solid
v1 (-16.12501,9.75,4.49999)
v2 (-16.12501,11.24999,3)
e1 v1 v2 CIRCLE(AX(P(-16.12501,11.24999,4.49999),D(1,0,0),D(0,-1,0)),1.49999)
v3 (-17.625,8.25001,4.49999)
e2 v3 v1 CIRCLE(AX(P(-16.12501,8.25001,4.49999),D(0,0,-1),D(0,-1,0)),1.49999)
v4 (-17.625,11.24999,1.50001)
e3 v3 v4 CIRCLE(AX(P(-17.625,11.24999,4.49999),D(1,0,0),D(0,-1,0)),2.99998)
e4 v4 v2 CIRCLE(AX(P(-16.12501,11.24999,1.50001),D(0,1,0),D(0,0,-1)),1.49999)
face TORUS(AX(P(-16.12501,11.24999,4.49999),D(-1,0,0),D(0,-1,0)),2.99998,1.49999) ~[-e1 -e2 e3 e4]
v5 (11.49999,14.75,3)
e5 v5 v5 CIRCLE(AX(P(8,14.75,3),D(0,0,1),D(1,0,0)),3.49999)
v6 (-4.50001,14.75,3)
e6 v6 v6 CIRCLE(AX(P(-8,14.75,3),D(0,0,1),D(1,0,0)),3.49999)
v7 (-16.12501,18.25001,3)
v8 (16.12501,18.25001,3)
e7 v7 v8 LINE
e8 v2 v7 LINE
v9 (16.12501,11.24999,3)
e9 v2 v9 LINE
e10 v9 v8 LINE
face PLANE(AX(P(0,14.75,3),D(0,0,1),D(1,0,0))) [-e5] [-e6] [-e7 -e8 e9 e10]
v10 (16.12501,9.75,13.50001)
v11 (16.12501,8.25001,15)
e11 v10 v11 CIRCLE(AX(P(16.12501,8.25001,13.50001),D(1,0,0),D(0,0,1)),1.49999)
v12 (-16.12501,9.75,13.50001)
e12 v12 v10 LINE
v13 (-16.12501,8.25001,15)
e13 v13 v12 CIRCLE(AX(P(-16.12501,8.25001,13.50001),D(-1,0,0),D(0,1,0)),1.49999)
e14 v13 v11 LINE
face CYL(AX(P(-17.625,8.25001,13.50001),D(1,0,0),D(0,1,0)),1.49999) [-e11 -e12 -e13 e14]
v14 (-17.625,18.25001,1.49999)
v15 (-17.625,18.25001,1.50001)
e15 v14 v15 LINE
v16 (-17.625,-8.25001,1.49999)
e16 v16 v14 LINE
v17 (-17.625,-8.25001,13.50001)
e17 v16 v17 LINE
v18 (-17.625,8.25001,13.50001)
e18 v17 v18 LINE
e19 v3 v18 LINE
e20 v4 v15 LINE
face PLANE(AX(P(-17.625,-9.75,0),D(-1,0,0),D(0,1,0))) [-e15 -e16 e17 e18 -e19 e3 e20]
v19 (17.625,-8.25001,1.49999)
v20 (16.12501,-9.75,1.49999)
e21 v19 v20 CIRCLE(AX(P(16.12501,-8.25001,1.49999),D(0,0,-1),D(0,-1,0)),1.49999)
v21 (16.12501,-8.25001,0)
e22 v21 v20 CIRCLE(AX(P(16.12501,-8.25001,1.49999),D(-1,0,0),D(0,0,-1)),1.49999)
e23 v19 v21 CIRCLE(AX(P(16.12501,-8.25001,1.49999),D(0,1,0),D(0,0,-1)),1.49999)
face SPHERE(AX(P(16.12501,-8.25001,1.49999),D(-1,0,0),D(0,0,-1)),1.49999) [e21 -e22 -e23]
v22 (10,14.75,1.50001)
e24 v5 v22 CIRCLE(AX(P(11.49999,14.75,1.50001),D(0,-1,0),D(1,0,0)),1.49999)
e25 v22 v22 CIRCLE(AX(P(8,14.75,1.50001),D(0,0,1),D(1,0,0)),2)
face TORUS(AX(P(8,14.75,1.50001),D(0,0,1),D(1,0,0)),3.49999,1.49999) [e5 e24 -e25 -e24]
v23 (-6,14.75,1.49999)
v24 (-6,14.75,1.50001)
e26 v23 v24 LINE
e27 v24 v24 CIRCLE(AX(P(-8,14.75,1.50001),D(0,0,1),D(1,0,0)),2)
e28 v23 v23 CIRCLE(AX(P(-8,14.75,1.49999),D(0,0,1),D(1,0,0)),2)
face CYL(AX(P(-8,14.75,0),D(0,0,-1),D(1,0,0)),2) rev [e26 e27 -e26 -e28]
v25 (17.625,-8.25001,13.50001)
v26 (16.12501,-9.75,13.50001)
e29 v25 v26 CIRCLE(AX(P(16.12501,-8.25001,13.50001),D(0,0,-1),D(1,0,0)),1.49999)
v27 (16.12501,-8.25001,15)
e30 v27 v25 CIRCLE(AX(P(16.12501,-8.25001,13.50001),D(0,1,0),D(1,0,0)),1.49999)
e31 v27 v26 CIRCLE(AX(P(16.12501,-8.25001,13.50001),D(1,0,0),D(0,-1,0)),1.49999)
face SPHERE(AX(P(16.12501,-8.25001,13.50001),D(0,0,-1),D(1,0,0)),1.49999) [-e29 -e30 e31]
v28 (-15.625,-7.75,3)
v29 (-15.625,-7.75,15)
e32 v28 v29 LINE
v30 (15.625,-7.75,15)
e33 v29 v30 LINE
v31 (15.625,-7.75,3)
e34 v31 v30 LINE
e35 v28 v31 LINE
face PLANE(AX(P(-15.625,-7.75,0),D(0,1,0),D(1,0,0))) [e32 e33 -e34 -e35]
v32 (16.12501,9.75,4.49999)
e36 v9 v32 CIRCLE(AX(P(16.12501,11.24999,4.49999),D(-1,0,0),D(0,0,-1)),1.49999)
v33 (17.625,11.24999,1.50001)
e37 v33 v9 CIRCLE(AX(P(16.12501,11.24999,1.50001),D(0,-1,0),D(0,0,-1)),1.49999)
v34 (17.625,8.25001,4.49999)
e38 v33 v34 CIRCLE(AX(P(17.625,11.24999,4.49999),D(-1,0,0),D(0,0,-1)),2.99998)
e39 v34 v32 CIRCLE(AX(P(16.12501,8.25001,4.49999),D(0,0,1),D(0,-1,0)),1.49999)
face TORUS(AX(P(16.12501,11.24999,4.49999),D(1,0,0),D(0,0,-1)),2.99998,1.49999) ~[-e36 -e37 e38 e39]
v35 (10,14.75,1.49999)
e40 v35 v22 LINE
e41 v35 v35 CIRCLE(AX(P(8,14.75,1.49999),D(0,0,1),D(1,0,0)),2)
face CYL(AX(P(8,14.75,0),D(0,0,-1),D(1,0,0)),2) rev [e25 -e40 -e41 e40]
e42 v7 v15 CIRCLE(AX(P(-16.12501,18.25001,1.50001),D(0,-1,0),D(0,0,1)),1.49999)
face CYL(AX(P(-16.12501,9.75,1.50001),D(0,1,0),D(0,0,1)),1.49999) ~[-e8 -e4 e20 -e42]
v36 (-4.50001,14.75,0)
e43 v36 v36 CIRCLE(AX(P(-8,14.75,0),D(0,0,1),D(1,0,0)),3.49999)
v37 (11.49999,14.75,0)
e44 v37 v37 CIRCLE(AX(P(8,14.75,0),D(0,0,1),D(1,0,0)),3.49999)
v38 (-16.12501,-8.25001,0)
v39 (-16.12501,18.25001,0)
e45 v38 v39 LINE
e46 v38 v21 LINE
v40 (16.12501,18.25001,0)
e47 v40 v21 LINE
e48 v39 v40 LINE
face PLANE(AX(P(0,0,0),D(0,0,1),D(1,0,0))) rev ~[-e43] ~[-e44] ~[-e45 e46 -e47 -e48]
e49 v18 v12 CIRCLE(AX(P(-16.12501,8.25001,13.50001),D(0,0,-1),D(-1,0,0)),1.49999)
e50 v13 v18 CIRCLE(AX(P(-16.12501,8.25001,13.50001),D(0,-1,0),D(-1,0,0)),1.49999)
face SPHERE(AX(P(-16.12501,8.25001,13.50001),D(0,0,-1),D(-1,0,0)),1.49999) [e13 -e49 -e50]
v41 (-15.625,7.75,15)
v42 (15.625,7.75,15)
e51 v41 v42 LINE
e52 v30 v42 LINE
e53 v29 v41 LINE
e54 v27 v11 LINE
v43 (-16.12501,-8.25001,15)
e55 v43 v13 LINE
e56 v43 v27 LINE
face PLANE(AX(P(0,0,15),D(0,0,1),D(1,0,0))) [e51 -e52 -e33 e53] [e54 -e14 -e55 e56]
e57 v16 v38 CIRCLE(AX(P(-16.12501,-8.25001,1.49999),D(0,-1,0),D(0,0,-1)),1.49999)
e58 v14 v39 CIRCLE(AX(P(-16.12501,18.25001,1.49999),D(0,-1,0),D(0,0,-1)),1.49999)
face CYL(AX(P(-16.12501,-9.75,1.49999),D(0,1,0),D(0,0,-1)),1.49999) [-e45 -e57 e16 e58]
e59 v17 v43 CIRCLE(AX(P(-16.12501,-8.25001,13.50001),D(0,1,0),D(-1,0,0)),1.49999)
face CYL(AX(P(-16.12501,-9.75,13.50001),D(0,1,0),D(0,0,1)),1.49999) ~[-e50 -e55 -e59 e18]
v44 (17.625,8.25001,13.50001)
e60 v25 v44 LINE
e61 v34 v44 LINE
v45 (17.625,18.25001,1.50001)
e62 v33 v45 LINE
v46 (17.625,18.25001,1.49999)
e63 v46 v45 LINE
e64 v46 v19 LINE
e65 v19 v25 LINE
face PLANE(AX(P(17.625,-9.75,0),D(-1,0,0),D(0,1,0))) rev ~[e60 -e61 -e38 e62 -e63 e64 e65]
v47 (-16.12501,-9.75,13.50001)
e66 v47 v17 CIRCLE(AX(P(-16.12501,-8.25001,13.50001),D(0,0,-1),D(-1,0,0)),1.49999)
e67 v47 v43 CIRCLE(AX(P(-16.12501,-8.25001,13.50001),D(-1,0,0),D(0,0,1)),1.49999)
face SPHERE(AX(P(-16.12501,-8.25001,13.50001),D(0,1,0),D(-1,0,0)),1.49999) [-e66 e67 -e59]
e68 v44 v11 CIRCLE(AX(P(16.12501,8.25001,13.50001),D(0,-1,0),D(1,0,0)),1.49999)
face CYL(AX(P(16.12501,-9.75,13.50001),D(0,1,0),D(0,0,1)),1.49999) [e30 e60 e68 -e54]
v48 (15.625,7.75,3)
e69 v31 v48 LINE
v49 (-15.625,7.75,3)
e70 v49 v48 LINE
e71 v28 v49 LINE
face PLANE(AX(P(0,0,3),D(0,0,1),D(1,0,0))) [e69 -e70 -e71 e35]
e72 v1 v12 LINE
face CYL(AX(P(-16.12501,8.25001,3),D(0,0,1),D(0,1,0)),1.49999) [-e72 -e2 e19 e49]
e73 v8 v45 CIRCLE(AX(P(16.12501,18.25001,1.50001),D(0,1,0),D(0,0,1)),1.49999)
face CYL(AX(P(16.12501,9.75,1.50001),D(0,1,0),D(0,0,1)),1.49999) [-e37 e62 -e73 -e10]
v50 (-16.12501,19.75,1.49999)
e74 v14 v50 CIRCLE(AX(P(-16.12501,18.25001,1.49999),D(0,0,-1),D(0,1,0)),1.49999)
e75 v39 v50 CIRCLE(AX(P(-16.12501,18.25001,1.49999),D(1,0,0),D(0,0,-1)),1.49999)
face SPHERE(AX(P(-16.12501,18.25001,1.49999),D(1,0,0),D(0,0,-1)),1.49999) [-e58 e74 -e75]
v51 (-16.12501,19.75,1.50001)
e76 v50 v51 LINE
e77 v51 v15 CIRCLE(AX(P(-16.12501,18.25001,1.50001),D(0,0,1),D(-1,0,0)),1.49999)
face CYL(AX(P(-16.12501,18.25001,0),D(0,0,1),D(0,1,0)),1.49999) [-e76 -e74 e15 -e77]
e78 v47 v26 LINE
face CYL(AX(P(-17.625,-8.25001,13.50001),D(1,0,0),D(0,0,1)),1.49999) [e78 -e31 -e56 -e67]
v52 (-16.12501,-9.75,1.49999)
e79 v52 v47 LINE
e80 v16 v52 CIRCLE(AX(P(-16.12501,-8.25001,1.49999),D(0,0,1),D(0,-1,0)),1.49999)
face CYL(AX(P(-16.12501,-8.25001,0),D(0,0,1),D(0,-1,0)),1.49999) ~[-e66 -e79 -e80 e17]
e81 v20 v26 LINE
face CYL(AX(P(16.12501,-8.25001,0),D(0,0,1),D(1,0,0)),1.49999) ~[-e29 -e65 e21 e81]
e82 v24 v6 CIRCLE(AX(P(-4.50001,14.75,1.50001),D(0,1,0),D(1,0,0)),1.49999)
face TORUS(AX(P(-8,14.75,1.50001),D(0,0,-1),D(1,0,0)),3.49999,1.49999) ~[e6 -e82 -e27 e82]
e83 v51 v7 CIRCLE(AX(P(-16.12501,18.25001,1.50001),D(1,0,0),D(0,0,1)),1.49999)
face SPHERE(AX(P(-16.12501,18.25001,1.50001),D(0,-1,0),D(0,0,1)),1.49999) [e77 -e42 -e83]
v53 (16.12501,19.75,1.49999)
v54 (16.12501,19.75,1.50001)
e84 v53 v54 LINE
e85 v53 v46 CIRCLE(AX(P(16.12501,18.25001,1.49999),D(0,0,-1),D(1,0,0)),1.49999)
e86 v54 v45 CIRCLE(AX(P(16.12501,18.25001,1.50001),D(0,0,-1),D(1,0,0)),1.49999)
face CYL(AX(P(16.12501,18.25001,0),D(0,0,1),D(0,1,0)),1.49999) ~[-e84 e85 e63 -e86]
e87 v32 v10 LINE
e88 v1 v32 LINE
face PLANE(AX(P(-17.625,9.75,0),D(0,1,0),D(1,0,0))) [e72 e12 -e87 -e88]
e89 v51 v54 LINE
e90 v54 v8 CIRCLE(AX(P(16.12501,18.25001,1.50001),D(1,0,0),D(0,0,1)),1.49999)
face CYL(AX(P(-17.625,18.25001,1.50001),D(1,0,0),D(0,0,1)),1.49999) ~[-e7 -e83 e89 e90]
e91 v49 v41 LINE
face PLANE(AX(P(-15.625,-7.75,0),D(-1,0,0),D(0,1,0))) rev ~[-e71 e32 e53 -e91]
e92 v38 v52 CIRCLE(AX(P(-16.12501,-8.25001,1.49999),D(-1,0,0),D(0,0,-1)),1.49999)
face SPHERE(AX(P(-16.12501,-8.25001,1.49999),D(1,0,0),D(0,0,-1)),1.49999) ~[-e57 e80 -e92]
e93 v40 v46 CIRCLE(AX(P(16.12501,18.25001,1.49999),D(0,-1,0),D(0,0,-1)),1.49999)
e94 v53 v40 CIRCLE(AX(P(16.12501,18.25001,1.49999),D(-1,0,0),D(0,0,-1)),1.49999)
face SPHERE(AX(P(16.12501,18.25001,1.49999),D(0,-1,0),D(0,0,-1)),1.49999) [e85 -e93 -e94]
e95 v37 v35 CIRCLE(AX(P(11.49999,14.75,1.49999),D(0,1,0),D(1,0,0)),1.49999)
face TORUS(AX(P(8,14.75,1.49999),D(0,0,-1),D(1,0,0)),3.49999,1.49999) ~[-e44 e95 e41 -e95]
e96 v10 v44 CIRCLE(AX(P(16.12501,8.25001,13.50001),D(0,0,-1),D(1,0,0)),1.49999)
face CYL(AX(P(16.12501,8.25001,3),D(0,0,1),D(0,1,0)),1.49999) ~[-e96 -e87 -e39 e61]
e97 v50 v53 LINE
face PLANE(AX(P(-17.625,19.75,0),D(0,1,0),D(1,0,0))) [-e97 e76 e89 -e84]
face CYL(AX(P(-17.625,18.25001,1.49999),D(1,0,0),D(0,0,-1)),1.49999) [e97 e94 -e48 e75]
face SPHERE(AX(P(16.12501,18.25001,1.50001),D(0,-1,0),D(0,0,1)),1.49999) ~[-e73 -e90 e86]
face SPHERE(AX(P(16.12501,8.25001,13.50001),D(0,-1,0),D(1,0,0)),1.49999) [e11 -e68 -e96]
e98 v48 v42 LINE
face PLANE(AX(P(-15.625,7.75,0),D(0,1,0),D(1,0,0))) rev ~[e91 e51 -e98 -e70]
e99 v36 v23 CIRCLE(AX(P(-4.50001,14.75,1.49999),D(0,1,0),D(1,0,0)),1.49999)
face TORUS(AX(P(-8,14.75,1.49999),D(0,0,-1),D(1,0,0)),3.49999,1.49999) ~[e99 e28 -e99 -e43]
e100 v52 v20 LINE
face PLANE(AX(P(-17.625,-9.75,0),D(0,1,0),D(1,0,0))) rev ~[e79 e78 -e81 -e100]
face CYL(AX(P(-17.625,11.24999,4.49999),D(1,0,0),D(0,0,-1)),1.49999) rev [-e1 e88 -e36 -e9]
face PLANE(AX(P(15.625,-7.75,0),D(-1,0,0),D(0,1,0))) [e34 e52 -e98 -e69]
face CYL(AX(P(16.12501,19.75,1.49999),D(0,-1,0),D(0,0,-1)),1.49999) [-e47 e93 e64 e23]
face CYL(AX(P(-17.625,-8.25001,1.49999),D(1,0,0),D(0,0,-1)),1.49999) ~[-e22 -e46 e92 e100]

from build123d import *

# Parameters (mm, degrees)
F0_W     = 35.25
F0_H     = 19.5
F0_W_2   = 31.25
F0_H_2   = 15.5
F1_DEPTH = 15
F0_H_3   = 10
F0_R     = 2
F2_DEPTH = 3
F3_R     = 1.49999


# Not quite as in the source:
# - a fillet or chamfer is up to 0.001 mm smaller than in the source, because OpenCascade refuses the exact size


with BuildPart() as f1:
    # F0 (on Top) → F1 (new body)
    with BuildSketch(Plane.XY):
        Rectangle(F0_W, F0_H)
        Rectangle(F0_W_2, F0_H_2, mode=Mode.SUBTRACT)
    extrude(amount=F1_DEPTH)

    # F0 (on Top) → F2 (join)
    with BuildSketch(Plane.XY):
        Rectangle(F0_W_2, F0_H_2)
        with Locations((0, 14.75)):
            Rectangle(F0_W, F0_H_3)
        with Locations((-8, 14.75)):
            Circle(F0_R, mode=Mode.SUBTRACT)
        with Locations((8, 14.75)):
            Circle(F0_R, mode=Mode.SUBTRACT)
    extrude(amount=F2_DEPTH)

    # F3 (radius 1.5 in the source; OpenCascade refuses exactly that, so slightly less here)
    f3_edges = [f1.edges().sort_by_distance(p)[0] for p in [
        (-17.625, 14.75, 3),
        (0, 9.75, 3),
        (17.625, 14.75, 3),
        (0, 19.75, 3),
        (-10, 14.75, 3),
        (6, 14.75, 3),
        (0, -9.75, 0),
        (17.625, 5, 0),
        (0, 19.75, 0),
        (-17.625, 5, 0),
        (6, 14.75, 0),
        (-10, 14.75, 0),
        (-17.625, 9.75, 9),
        (-17.625, 0, 15),
        (-17.625, -9.75, 7.5),
        (-17.625, 19.75, 1.5),
        (17.625, -9.75, 7.5),
        (17.625, 0, 15),
        (17.625, 9.75, 9),
        (17.625, 19.75, 1.5),
        (0, -9.75, 15),
        (0, 9.75, 15),
    ]]
    fillet(f3_edges, radius=F3_R)


solid = f1.part
